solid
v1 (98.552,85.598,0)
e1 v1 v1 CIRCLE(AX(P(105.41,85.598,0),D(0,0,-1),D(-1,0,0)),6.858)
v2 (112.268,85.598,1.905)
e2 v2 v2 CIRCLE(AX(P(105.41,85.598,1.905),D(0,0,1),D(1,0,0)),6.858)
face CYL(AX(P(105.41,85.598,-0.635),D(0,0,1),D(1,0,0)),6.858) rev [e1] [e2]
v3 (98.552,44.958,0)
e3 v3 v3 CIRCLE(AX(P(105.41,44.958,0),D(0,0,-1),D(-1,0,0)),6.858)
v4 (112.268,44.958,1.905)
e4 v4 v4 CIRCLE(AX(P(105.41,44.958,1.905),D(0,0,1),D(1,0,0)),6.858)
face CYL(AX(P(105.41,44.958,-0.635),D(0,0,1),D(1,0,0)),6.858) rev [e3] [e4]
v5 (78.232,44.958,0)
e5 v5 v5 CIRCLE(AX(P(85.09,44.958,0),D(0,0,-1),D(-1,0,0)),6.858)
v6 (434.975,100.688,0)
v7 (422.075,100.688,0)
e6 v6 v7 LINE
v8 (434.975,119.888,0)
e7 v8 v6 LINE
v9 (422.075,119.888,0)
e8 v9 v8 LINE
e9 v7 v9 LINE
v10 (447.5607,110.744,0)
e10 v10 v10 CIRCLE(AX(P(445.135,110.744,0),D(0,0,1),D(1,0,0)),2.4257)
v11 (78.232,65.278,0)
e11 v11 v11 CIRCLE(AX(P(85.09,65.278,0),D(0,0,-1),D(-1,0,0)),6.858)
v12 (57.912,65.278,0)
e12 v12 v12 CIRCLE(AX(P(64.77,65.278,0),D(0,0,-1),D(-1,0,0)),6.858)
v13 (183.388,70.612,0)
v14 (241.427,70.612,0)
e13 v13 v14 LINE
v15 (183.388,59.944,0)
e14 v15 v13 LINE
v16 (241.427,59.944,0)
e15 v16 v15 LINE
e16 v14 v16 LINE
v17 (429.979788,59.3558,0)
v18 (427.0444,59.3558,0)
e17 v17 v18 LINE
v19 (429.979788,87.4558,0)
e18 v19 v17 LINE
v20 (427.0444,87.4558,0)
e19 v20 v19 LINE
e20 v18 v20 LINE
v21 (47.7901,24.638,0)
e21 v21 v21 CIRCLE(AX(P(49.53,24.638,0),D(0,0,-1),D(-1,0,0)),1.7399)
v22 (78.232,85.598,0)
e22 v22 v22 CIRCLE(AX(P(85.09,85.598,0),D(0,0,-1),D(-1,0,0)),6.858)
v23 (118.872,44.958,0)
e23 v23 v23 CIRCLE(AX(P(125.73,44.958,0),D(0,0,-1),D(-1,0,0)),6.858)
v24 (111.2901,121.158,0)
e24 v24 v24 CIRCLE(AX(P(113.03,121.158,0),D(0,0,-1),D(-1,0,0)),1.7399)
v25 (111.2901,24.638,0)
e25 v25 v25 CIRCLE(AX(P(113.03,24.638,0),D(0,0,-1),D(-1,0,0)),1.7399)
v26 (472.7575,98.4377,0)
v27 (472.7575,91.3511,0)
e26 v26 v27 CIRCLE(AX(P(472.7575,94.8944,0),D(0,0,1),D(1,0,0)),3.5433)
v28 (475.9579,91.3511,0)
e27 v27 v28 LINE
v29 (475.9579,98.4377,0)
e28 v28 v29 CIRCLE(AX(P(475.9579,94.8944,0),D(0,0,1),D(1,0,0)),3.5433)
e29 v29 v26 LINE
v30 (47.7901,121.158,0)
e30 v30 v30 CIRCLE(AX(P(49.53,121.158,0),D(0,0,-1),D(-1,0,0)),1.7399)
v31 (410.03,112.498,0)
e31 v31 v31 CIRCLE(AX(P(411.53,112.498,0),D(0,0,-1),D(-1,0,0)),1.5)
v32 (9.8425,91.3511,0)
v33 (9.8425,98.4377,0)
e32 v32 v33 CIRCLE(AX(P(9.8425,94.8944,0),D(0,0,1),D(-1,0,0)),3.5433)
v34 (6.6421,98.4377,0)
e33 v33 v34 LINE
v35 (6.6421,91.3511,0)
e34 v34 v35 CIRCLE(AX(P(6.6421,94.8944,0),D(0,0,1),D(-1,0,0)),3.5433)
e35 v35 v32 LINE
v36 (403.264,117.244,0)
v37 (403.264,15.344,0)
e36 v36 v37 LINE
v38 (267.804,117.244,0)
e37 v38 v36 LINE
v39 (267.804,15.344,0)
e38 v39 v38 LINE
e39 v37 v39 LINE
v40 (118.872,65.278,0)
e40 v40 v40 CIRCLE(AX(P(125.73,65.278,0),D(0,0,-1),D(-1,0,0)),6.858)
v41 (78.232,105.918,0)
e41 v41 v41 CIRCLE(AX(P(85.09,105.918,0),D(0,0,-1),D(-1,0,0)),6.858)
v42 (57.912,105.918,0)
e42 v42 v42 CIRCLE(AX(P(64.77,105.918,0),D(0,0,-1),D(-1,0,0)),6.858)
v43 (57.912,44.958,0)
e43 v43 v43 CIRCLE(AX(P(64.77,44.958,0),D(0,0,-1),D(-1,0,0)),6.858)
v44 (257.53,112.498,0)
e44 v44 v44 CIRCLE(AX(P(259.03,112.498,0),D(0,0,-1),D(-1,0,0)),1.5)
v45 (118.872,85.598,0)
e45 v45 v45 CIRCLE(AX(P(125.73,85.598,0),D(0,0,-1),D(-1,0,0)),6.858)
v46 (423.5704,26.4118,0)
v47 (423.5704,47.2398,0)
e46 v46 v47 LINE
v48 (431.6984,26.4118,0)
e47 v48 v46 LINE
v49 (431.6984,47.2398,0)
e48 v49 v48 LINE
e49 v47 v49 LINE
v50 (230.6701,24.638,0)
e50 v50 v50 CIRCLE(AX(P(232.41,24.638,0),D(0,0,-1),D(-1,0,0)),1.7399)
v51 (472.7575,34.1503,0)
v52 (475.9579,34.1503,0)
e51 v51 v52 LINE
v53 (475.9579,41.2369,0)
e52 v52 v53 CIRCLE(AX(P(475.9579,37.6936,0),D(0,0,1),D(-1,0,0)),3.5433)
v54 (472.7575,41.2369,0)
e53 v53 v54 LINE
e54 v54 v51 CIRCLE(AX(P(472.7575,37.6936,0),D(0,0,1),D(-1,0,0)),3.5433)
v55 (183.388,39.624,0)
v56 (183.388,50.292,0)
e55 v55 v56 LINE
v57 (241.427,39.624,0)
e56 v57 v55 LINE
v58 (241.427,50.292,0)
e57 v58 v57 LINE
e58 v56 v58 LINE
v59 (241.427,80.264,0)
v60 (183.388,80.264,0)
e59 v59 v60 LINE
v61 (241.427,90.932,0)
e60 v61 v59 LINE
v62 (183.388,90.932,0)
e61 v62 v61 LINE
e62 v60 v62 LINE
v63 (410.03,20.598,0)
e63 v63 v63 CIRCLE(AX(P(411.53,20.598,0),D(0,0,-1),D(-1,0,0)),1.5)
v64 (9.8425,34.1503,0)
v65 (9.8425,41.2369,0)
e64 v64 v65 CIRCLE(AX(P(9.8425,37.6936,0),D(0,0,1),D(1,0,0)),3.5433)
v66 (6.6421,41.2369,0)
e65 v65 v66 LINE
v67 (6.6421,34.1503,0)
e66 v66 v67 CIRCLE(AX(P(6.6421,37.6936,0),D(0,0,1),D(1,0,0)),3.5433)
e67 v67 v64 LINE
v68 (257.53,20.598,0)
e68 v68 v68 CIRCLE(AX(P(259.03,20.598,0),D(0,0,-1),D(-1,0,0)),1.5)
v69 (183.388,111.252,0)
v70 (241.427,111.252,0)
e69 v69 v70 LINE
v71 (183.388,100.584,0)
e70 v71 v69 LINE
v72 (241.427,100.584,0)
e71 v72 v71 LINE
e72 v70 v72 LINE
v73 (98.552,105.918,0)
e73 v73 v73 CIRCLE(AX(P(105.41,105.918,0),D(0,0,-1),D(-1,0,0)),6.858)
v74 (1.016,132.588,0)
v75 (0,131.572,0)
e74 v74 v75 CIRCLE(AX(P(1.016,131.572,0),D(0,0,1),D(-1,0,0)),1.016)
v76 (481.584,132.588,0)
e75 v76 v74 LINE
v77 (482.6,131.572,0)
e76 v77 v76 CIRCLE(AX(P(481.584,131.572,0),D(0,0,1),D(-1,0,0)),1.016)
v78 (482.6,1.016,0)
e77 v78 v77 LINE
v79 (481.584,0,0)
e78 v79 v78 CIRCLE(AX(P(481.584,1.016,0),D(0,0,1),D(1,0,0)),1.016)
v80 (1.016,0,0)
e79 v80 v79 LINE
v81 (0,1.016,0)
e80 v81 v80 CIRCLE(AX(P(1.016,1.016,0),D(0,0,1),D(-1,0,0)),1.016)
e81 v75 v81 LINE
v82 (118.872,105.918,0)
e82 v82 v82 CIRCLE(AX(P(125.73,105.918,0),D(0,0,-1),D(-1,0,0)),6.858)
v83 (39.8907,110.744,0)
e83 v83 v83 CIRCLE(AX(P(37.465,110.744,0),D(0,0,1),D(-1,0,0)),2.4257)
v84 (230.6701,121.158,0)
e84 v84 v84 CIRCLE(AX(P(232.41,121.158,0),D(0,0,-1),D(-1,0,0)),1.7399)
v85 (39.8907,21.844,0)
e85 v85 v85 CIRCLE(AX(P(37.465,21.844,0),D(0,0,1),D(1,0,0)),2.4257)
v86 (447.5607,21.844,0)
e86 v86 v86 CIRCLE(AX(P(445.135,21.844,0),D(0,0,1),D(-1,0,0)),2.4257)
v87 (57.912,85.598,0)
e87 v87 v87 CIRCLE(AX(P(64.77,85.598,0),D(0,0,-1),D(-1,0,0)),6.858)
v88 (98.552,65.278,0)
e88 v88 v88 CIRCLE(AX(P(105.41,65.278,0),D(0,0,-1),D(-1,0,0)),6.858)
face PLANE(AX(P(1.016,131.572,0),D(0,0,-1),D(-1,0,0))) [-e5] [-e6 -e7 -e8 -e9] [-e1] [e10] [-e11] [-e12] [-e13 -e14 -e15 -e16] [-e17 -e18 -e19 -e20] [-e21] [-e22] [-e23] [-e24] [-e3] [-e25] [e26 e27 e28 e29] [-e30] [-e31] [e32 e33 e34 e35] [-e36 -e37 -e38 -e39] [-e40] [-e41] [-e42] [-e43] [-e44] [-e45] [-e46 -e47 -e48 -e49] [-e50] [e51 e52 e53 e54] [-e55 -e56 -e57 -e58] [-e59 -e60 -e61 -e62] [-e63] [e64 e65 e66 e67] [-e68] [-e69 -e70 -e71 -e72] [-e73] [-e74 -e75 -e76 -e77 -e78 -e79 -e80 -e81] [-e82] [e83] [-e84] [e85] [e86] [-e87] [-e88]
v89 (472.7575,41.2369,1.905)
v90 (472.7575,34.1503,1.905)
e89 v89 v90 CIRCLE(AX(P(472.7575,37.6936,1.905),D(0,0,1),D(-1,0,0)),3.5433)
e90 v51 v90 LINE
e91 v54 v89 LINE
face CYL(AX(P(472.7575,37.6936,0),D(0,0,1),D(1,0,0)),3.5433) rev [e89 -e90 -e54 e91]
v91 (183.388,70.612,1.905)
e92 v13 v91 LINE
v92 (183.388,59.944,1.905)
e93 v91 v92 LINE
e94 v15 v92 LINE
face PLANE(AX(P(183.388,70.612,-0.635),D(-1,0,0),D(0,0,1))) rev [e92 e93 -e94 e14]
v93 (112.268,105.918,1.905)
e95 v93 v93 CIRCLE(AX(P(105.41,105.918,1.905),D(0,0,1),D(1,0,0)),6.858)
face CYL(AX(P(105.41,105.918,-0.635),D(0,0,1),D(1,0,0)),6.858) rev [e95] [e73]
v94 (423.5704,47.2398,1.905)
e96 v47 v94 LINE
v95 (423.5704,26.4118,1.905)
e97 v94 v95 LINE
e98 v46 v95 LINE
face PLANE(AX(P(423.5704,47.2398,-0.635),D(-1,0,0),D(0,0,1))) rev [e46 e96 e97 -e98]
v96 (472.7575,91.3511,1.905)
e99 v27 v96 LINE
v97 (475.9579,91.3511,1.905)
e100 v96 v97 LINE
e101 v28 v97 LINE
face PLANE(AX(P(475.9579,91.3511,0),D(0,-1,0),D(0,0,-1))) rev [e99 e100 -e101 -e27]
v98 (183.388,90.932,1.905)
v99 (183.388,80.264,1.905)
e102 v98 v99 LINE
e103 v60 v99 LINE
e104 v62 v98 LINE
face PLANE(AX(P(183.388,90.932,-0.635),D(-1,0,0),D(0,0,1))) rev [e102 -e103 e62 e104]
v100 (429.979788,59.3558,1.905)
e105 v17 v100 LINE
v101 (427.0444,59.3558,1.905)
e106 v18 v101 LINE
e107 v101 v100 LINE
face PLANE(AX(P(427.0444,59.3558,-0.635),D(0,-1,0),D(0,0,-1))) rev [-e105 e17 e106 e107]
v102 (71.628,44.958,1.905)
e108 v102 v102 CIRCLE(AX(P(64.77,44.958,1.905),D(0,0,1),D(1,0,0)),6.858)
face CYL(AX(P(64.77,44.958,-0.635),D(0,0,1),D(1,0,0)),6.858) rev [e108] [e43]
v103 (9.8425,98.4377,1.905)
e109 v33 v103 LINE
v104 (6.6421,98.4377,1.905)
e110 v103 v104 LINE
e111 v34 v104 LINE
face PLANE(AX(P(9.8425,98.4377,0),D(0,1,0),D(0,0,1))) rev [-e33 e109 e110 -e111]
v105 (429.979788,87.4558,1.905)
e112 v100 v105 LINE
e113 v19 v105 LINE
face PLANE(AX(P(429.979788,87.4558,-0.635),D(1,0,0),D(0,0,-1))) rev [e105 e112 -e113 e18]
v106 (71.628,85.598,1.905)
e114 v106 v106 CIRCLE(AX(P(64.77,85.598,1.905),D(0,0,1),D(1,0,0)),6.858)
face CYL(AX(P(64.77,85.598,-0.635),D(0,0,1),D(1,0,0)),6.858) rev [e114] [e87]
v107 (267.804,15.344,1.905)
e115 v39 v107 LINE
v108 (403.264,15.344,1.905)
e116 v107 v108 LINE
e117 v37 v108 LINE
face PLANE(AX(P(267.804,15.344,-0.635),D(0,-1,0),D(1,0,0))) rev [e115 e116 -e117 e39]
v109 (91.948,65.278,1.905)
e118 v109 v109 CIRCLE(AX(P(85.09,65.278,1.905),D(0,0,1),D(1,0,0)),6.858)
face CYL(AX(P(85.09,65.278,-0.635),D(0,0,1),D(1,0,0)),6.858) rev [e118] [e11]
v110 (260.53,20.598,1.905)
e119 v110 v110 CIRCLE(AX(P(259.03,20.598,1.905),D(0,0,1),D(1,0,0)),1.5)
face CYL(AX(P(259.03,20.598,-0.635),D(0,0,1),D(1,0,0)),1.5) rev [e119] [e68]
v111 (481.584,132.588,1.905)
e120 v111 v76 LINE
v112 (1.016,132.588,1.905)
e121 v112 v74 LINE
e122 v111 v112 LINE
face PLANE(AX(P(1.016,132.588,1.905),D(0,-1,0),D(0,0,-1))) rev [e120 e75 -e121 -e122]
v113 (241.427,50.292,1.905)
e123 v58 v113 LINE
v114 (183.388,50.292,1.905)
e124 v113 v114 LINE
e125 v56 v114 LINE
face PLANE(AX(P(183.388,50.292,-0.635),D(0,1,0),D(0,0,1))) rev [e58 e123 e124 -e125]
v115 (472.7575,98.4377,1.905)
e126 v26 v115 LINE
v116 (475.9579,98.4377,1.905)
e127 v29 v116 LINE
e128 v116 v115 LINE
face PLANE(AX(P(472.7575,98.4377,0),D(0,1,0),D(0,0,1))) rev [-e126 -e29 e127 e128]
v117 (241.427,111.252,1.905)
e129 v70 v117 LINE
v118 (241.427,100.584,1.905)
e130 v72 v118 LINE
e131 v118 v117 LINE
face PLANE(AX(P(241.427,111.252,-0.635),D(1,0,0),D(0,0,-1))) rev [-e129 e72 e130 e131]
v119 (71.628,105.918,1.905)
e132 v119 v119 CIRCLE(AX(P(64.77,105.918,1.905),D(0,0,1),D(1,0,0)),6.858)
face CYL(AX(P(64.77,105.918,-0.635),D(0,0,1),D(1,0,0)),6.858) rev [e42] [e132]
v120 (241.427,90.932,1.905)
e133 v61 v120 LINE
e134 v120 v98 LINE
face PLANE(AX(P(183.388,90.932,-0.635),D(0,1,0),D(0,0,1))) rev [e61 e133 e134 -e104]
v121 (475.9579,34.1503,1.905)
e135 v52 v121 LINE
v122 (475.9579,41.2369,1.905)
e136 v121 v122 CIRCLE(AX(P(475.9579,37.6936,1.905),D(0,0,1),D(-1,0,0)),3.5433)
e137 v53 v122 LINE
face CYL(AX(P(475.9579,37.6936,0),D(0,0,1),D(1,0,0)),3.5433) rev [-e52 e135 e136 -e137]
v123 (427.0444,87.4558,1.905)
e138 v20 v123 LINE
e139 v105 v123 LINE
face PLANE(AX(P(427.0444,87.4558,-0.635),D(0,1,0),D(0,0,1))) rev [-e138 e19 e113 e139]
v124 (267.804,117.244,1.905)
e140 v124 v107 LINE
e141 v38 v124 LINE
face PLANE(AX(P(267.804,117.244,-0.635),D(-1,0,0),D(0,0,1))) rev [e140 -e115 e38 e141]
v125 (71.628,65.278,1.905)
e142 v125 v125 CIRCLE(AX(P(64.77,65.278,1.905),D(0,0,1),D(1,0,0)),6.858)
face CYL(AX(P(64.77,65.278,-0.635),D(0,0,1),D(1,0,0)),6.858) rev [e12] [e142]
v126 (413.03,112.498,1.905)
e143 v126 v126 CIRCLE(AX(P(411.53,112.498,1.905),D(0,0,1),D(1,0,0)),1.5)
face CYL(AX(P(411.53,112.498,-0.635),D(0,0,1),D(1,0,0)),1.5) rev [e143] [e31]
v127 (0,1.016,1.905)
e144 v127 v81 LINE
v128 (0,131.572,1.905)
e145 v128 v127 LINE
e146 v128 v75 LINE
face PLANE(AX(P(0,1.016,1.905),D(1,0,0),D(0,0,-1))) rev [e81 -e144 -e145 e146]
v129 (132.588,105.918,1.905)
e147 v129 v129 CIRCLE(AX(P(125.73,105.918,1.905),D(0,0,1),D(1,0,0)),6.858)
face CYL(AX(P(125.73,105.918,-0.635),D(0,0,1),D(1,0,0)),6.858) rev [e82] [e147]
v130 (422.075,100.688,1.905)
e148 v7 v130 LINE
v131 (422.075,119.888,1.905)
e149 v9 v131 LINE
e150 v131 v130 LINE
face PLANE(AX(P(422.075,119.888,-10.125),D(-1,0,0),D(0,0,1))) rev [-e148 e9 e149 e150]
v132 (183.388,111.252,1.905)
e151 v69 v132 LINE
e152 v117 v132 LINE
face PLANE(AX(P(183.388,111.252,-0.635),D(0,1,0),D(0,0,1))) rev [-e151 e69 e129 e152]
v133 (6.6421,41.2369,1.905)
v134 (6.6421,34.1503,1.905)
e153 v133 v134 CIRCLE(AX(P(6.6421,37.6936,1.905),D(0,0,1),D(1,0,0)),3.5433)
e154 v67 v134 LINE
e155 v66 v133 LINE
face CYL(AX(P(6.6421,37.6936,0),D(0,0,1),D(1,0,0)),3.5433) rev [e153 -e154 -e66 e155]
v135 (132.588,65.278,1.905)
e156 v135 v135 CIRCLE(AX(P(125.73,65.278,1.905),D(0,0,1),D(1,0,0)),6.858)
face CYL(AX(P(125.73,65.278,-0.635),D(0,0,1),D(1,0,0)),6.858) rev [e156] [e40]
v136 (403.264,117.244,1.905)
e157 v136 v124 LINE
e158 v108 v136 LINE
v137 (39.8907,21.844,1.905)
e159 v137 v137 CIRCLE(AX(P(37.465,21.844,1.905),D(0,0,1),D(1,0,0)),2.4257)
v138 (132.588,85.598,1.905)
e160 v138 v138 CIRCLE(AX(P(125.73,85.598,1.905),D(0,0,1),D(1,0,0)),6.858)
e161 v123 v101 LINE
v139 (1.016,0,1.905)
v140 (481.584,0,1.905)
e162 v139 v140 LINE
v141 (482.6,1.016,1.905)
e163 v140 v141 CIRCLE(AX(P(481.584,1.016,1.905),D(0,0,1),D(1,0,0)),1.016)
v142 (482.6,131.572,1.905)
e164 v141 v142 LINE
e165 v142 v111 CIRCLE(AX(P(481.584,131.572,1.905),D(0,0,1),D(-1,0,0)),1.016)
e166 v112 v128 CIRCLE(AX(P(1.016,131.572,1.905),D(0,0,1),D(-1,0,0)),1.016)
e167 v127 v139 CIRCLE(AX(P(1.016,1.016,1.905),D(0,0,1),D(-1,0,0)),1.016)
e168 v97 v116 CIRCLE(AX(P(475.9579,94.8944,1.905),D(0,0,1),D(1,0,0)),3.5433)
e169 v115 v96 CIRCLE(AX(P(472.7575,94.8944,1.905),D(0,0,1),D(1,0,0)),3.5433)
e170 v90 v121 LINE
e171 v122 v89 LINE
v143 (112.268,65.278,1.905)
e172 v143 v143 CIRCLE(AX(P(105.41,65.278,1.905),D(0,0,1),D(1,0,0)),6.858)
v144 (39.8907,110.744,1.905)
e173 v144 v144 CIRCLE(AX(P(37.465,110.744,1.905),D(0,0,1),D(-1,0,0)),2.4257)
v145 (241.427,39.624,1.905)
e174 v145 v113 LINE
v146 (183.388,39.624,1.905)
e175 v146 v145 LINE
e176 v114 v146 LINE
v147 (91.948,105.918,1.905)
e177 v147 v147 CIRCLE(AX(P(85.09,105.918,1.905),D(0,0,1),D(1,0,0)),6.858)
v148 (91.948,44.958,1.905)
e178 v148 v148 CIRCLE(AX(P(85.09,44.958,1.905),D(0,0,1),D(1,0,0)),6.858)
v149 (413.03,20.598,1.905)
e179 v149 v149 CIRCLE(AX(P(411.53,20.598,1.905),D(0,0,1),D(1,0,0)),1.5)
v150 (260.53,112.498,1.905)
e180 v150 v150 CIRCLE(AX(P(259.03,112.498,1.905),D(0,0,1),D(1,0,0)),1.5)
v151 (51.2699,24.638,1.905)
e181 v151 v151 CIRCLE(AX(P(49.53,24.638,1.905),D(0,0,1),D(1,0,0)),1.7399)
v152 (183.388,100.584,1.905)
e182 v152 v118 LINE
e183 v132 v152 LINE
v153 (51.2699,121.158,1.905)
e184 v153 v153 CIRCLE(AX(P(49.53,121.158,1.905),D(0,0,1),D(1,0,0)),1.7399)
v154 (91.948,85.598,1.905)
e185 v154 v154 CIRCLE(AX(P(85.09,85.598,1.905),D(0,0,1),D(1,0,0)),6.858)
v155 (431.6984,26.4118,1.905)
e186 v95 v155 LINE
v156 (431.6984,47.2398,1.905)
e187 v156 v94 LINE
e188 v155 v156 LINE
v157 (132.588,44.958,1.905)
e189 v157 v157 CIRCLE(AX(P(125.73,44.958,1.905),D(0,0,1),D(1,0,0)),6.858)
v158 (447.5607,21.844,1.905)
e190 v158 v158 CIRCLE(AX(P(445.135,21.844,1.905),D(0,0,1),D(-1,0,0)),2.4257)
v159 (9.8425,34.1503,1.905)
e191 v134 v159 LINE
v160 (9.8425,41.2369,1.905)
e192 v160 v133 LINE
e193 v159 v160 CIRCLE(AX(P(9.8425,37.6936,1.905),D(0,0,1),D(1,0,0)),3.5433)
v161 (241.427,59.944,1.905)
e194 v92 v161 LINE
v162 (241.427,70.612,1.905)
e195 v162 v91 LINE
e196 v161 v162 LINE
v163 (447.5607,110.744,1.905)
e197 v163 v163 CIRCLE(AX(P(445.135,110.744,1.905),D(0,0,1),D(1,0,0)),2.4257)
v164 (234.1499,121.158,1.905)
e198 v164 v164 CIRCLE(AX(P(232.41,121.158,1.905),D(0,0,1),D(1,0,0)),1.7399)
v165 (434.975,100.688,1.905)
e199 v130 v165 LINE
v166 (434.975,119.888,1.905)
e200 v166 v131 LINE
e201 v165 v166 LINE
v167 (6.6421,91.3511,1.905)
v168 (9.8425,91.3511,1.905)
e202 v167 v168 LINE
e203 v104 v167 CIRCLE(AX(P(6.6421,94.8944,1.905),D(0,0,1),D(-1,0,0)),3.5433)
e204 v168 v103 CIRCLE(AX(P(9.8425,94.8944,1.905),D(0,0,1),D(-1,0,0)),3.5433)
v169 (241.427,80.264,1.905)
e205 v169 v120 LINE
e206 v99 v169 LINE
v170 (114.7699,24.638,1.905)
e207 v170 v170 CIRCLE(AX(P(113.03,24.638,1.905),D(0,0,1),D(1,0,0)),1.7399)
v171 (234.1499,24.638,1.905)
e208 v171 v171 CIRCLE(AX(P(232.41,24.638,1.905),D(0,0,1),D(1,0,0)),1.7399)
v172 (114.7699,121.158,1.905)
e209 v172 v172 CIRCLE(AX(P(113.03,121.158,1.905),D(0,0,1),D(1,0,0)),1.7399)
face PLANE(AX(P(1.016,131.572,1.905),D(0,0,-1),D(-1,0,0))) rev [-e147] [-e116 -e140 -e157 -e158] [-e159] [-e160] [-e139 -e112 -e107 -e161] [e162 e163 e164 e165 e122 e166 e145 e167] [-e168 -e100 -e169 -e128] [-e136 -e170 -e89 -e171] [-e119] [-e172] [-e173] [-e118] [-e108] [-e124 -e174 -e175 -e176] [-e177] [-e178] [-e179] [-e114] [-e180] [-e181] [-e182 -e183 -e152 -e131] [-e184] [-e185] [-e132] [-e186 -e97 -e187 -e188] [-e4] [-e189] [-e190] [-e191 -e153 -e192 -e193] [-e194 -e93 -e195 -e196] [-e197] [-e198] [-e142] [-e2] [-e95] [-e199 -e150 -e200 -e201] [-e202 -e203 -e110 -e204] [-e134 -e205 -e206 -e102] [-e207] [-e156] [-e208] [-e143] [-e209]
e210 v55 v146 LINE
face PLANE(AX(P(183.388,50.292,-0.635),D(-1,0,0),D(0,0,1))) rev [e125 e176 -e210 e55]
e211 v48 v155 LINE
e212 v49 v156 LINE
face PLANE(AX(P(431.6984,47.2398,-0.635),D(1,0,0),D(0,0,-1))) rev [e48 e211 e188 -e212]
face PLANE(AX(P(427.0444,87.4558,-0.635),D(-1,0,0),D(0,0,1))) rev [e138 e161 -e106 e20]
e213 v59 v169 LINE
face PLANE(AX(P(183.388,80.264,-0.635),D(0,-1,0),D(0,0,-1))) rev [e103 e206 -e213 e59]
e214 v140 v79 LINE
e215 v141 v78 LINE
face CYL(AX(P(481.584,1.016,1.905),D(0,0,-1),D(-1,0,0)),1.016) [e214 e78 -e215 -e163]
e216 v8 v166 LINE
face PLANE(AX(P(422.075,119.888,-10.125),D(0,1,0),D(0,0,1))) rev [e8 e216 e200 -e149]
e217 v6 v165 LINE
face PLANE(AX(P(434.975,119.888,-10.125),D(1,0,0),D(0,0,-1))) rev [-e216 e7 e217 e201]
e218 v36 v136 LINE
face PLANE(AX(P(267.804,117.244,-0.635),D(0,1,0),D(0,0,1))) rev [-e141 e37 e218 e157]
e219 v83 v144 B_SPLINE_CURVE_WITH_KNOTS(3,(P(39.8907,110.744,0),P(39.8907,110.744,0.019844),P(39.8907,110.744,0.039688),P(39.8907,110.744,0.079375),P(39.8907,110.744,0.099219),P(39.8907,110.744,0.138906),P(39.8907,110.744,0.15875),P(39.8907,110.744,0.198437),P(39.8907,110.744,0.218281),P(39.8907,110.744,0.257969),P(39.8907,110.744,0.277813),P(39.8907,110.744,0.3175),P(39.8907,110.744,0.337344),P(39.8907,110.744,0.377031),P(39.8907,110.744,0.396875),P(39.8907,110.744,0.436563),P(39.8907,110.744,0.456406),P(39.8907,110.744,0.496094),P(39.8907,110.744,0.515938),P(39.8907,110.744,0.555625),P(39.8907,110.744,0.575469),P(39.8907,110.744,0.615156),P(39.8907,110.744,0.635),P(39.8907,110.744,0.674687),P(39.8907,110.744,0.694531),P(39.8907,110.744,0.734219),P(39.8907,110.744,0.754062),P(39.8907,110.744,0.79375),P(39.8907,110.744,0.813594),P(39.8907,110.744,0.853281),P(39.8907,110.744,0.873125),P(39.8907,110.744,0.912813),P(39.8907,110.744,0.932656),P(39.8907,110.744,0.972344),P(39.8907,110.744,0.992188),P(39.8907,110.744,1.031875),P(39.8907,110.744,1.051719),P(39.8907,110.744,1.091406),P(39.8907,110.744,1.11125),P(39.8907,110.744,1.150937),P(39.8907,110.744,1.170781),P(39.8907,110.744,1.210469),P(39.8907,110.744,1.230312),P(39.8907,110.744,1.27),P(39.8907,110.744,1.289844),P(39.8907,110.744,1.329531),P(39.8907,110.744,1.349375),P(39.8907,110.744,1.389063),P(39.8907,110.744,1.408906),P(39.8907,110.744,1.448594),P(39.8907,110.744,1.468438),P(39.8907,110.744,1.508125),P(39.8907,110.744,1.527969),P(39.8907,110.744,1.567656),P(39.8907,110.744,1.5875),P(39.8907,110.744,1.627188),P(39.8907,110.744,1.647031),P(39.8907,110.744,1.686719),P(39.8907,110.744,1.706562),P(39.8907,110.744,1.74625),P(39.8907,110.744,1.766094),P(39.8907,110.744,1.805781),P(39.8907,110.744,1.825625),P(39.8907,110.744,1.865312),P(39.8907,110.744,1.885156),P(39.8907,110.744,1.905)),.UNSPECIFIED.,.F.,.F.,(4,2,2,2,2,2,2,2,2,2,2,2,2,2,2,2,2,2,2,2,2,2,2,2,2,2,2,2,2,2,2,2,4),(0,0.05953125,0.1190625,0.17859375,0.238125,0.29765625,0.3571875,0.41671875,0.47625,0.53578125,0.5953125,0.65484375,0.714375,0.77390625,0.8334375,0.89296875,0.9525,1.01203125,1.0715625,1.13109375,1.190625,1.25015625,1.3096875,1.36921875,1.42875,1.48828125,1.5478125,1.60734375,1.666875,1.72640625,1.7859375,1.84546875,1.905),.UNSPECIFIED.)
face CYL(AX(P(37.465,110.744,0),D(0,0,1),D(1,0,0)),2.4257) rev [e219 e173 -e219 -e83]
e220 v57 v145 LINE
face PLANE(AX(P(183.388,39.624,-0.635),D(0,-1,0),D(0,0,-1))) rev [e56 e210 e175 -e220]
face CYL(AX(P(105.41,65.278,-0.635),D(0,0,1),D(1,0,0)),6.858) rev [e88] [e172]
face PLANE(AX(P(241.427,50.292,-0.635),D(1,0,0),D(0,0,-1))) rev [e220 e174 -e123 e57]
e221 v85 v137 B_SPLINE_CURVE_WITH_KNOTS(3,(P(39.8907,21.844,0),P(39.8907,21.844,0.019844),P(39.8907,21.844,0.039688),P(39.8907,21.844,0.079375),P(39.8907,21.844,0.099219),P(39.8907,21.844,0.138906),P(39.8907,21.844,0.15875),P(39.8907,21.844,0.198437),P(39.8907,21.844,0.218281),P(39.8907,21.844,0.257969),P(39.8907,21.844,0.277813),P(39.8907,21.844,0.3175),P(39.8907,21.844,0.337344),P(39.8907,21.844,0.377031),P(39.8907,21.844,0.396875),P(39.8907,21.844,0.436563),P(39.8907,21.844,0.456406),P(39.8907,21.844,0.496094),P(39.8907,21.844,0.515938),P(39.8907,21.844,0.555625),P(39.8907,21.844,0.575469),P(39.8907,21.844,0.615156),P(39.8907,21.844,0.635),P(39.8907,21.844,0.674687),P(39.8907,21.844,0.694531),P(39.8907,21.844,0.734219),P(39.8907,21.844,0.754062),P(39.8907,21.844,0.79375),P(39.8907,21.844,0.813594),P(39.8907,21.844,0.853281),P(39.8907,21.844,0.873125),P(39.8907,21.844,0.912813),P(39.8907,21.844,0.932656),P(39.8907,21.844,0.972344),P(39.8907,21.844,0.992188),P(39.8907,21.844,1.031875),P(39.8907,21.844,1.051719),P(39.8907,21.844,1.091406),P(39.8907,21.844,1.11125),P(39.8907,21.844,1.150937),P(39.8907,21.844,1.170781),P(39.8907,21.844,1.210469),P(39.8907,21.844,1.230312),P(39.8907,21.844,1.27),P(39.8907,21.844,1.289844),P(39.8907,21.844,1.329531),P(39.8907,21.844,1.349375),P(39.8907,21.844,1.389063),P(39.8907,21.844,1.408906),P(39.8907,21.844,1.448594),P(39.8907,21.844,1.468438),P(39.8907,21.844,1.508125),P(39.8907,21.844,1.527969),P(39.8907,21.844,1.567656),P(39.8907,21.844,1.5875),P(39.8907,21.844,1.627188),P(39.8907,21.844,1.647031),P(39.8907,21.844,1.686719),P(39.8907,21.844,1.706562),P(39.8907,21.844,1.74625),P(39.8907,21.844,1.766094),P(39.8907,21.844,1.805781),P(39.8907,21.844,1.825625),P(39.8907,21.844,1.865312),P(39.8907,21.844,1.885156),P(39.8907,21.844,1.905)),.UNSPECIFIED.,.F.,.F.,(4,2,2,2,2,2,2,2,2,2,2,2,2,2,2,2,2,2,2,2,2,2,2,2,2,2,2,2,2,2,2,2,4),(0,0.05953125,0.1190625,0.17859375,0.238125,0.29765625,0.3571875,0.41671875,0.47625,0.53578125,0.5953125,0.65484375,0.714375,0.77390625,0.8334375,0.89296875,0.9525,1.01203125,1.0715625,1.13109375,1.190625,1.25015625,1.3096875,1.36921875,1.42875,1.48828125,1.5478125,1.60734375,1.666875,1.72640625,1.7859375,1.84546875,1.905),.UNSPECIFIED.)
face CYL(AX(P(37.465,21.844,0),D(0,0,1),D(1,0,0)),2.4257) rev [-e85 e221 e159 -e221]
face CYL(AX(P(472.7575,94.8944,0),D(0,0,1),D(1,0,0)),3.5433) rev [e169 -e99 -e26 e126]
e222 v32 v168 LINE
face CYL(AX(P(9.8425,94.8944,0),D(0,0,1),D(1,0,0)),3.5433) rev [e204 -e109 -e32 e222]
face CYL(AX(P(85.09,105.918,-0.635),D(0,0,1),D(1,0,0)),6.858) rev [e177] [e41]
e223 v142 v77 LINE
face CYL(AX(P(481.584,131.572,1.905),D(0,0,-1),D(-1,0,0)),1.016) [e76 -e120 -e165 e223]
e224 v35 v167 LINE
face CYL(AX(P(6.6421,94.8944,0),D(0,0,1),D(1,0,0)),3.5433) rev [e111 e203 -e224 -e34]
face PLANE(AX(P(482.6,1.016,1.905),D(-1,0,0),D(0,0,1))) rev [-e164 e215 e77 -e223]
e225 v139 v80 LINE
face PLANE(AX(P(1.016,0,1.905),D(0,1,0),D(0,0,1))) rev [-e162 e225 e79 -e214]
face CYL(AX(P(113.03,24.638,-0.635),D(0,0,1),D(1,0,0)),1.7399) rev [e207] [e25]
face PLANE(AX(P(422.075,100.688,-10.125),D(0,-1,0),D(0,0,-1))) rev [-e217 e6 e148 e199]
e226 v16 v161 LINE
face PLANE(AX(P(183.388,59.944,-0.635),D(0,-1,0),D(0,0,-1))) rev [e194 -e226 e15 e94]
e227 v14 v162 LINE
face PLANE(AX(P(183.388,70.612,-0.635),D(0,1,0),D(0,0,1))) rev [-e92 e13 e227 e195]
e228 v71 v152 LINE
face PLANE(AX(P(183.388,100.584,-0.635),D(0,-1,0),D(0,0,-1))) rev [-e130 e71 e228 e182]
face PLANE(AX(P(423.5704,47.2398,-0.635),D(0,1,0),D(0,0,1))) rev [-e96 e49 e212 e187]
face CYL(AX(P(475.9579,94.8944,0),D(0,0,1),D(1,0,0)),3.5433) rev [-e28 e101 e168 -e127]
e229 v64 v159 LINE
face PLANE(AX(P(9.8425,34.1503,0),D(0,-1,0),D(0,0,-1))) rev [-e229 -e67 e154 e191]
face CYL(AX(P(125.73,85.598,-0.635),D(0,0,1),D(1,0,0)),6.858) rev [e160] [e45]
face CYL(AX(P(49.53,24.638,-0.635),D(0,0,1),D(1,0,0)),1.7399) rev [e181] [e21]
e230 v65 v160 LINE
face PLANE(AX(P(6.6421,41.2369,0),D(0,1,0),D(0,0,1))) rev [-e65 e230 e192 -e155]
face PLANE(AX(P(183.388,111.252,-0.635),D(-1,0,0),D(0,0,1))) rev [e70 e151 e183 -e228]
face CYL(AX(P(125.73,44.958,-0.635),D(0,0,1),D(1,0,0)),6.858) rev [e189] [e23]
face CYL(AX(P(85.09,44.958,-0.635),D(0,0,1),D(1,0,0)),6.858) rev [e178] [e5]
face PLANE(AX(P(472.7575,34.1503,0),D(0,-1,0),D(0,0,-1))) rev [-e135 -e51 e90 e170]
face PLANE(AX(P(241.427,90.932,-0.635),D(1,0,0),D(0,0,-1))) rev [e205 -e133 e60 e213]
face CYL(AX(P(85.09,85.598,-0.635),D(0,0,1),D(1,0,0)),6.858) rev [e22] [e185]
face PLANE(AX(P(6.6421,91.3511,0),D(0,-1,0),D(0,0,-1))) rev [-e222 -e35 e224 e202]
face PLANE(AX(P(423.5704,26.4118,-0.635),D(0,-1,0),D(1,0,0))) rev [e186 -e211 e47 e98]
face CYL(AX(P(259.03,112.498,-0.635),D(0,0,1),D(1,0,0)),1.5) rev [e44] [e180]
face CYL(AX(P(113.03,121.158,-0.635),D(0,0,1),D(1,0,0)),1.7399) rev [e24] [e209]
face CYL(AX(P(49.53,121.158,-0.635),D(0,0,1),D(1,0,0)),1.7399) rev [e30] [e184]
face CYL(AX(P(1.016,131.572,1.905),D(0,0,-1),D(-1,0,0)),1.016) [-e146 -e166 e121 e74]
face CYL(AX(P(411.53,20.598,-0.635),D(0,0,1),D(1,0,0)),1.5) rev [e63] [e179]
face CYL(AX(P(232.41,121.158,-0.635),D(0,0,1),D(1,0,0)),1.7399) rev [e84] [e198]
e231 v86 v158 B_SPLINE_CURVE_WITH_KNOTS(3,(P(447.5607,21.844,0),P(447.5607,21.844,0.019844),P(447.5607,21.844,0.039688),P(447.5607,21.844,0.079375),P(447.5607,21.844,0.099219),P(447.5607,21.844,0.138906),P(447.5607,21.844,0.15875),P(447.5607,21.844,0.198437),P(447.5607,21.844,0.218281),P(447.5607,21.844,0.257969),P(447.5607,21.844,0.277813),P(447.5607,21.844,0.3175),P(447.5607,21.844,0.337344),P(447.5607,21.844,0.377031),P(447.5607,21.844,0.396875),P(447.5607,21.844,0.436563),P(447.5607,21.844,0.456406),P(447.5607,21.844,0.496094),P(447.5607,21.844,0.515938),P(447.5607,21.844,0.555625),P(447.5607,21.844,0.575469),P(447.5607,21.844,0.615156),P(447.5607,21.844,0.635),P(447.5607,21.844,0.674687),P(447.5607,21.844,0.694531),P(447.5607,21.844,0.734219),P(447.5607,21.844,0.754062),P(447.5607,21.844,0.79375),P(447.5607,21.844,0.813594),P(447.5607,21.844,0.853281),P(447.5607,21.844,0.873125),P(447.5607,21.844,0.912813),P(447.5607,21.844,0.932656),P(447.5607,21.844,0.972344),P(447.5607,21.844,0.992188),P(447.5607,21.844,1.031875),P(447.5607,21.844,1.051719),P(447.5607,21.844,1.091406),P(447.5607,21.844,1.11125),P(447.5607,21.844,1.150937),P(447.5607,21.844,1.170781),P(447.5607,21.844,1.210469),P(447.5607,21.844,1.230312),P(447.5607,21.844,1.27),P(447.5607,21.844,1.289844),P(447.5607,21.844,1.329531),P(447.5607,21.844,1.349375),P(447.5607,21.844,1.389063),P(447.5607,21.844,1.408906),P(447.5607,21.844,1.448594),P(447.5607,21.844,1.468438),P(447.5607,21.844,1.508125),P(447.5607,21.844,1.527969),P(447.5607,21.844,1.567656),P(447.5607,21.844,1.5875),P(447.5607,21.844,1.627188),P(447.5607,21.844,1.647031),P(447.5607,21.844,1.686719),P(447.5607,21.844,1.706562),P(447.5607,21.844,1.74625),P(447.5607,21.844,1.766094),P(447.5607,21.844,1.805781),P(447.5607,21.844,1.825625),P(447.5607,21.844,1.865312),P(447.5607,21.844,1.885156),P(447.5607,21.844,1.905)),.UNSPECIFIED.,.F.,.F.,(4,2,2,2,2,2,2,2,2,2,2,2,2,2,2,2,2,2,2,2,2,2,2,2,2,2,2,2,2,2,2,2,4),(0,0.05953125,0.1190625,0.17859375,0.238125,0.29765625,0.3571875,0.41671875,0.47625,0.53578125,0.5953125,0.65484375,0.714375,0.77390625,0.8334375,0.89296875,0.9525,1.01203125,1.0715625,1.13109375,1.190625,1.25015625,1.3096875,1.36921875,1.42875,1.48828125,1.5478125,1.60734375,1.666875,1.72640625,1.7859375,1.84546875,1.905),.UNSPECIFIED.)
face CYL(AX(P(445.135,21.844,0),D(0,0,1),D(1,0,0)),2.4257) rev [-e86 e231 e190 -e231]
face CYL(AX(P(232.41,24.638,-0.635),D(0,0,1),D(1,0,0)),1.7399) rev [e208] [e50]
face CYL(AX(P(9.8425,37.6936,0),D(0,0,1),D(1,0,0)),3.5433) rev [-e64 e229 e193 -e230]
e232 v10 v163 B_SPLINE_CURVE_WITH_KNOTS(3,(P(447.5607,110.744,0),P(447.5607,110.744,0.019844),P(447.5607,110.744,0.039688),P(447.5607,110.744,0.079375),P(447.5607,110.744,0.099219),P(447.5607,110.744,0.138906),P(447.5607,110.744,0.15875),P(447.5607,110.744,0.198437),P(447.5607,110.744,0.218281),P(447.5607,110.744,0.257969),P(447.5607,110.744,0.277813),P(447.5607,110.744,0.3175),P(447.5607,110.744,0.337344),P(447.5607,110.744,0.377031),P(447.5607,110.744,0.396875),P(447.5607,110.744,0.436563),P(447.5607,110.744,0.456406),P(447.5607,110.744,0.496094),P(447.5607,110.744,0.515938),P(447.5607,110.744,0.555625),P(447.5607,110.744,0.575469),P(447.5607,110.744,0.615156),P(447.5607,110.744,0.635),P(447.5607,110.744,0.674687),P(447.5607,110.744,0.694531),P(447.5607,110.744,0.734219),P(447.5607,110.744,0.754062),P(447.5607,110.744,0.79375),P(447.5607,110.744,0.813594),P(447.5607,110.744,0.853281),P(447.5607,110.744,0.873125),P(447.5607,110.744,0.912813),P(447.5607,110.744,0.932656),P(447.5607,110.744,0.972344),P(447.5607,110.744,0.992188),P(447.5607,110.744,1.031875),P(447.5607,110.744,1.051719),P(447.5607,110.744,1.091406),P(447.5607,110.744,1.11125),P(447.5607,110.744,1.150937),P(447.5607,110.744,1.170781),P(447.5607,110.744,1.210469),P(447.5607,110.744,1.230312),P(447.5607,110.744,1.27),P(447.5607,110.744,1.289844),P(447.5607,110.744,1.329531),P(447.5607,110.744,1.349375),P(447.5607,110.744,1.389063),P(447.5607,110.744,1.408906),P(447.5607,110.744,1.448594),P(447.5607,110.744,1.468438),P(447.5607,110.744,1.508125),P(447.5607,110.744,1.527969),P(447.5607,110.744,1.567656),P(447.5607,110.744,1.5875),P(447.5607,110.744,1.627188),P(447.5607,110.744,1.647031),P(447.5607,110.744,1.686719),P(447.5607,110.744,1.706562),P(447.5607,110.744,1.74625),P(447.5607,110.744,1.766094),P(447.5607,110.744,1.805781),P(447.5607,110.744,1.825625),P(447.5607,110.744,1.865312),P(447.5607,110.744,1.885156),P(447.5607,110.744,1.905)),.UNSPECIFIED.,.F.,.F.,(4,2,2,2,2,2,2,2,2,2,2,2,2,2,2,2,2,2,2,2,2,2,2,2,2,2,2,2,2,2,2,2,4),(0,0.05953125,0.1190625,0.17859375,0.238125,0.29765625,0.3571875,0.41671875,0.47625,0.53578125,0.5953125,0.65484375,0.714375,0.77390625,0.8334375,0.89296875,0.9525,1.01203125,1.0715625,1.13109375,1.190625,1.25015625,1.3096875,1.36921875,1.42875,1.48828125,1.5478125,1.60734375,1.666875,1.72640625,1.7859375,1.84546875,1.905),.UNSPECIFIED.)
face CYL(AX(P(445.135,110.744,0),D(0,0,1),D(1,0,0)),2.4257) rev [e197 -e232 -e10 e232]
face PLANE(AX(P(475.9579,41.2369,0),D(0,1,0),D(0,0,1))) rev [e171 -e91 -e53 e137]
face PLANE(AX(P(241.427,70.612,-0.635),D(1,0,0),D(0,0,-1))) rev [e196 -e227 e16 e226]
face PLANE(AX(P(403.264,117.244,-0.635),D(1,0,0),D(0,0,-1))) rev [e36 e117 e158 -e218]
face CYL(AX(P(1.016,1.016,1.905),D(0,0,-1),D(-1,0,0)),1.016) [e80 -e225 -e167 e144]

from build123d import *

# Parameters (mm, degrees)
FRONT_PANEL_DEPTH                = 1.905
SKETCH5_R                        = 2.4257
SKETCH5_R_2                      = 2.0701
FRONT_PANEL_MOUNTING_HOLES_DEPTH = 1.905
RACK_MOUNTING_SLOT_DEPTH         = 1.905
ADIO_MOUNTING_HOLES_R            = 1.7399
CUT_EXTRUDE1_DEPTH               = 2.54
SKETCH8_R                        = 6.858
BNC_SEED_HOLE_DEPTH              = 2.54
BNC_PATTERN_COUNT                = 4
BNC_PATTERN_PITCH                = 20.32
BNC_PATTERN_COUNT_DIR2           = 4
BNC_PATTERN_PITCH_DIR2           = 20.32
SKETCH9_W                        = 58.039
SKETCH9_H                        = 10.668
DIO_SEED_HOLE_DEPTH              = 2.54
DIO_PATTERN_COUNT                = 4
DIO_PATTERN_PITCH                = 20.32
LCD_VIEW_CUTOUT_W                = 135.46
LCD_VIEW_CUTOUT_H                = 101.9
LCD_CUTOUT_DEPTH                 = 2.54
LCD_MOUNT_HOLES_R                = 1.5
LCD_MOUNT_HOLE_CUT_DEPTH         = 2.54
SKETCH10_W                       = 12.9
SKETCH10_H                       = 19.2
POWER_SW_CUT_DEPTH               = 12.03
SKETCH11_W                       = 2.935387627
SKETCH11_H                       = 28.1
SKETCH11_W_2                     = 8.128
SKETCH11_H_2                     = 20.828
CUT_EXTRUDE8_DEPTH               = 2.54


# Sheet-metal steps are written as plain solids
with BuildPart() as part:
    # Sketch1 → Front Panel (new body)
    with BuildSketch(Plane.XY):
        with BuildLine():
            Line((1.016, 0), (481.584, 0))
            ThreePointArc((481.584, 0), (482.30242049, 0.29757951), (482.6, 1.016))
            Line((482.6, 1.016), (482.6, 131.572))
            ThreePointArc((482.6, 131.572), (482.30242049, 132.29042049), (481.584, 132.588))
            Line((481.584, 132.588), (1.016, 132.588))
            ThreePointArc((1.016, 132.588), (0.29757951, 132.29042049), (0, 131.572))
            Line((0, 131.572), (0, 1.016))
            ThreePointArc((0, 1.016), (0.29757951, 0.29757951), (1.016, 0))
        make_face()
    extrude(amount=FRONT_PANEL_DEPTH)

    # Sketch5 → Front Panel Mounting Holes (cut)
    with BuildSketch(Plane.XY.offset(1.905)):
        with Locations((445.135, 21.844)):
            Circle(SKETCH5_R)
        with Locations((37.465, 21.844)):
            Circle(SKETCH5_R)
        with Locations((37.465, 110.744)):
            Circle(SKETCH5_R)
        with Locations((445.135, 110.744)):
            Circle(SKETCH5_R)
        with Locations((241.3, -19.907000064)):
            Circle(SKETCH5_R_2)
    extrude(amount=-FRONT_PANEL_MOUNTING_HOLES_DEPTH, mode=Mode.SUBTRACT)

    # Sketch2 → Rack Mounting Slot (cut)
    with BuildSketch(Plane.XY.offset(1.905)):
        with BuildLine():
            Line((472.7575, 34.1503), (475.9579, 34.1503))
            ThreePointArc((475.9579, 34.1503), (479.5012, 37.6936), (475.9579, 41.2369))
            Line((475.9579, 41.2369), (472.7575, 41.2369))
            ThreePointArc((472.7575, 41.2369), (469.2142, 37.6936), (472.7575, 34.1503))
        make_face()
        with BuildLine():
            Line((9.8425, 98.4377), (6.6421, 98.4377))
            ThreePointArc((6.6421, 98.4377), (3.0988, 94.8944), (6.6421, 91.3511))
            Line((6.6421, 91.3511), (9.8425, 91.3511))
            ThreePointArc((9.8425, 91.3511), (13.3858, 94.8944), (9.8425, 98.4377))
        make_face()
        with BuildLine():
            Line((6.6421, 41.2369), (9.8425, 41.2369))
            ThreePointArc((9.8425, 41.2369), (13.3858, 37.6936), (9.8425, 34.1503))
            Line((9.8425, 34.1503), (6.6421, 34.1503))
            ThreePointArc((6.6421, 34.1503), (3.0988, 37.6936), (6.6421, 41.2369))
        make_face()
        with BuildLine():
            Line((475.9579, 91.3511), (472.7575, 91.3511))
            ThreePointArc((472.7575, 91.3511), (469.2142, 94.8944), (472.7575, 98.4377))
            Line((472.7575, 98.4377), (475.9579, 98.4377))
            ThreePointArc((475.9579, 98.4377), (479.5012, 94.8944), (475.9579, 91.3511))
        make_face()
    extrude(amount=-RACK_MOUNTING_SLOT_DEPTH, mode=Mode.SUBTRACT)

    # ADio mounting holes → Cut-Extrude1 (cut)
    with BuildSketch(Plane.XY.offset(1.905)):
        with Locations((49.53, 121.158)):
            Circle(ADIO_MOUNTING_HOLES_R)
        with Locations((113.03, 121.158)):
            Circle(ADIO_MOUNTING_HOLES_R)
        with Locations((232.41, 121.158)):
            Circle(ADIO_MOUNTING_HOLES_R)
        with Locations((49.53, 24.638)):
            Circle(ADIO_MOUNTING_HOLES_R)
        with Locations((113.03, 24.638)):
            Circle(ADIO_MOUNTING_HOLES_R)
        with Locations((232.41, 24.638)):
            Circle(ADIO_MOUNTING_HOLES_R)
    extrude(amount=-CUT_EXTRUDE1_DEPTH, mode=Mode.SUBTRACT)

    # Sketch8 → BNC seed hole (cut)
    with BuildSketch(Plane.XY.offset(1.905)):
        with Locations((64.77, 105.918)):
            Circle(SKETCH8_R)
    bnc_seed_hole = extrude(amount=-BNC_SEED_HOLE_DEPTH, mode=Mode.SUBTRACT)

    # BNC pattern: BNC seed hole 4 × 4
    with Locations(*[(i * BNC_PATTERN_PITCH, -j * BNC_PATTERN_PITCH_DIR2, 0) for i in range(BNC_PATTERN_COUNT) for j in range(BNC_PATTERN_COUNT_DIR2) if (i, j) != (0, 0)]):
        add(bnc_seed_hole, mode=Mode.SUBTRACT)

    # Sketch9 → DIO Seed Hole (cut)
    with BuildSketch(Plane.XY.offset(1.905)):
        with Locations((212.4075, 105.918)):
            Rectangle(SKETCH9_W, SKETCH9_H)
    dio_seed_hole = extrude(amount=-DIO_SEED_HOLE_DEPTH, mode=Mode.SUBTRACT)

    # DIO Pattern: DIO Seed Hole ×4
    with Locations(*[(0, -i * DIO_PATTERN_PITCH, 0) for i in range(1, DIO_PATTERN_COUNT)]):
        add(dio_seed_hole, mode=Mode.SUBTRACT)

    # LCD view cutout → LCD Cutout (cut)
    with BuildSketch(Plane.XY.offset(1.905)):
        with Locations((335.534, 66.294)):
            Rectangle(LCD_VIEW_CUTOUT_W, LCD_VIEW_CUTOUT_H)
    extrude(amount=-LCD_CUTOUT_DEPTH, mode=Mode.SUBTRACT)

    # LCD mount holes → LCD mount hole - cut (cut)
    with BuildSketch(Plane.XY.offset(1.905)):
        with Locations((259.03, 112.498)):
            Circle(LCD_MOUNT_HOLES_R)
        with Locations((411.53, 112.498)):
            Circle(LCD_MOUNT_HOLES_R)
        with Locations((259.03, 20.598)):
            Circle(LCD_MOUNT_HOLES_R)
        with Locations((411.53, 20.598)):
            Circle(LCD_MOUNT_HOLES_R)
    extrude(amount=-LCD_MOUNT_HOLE_CUT_DEPTH, mode=Mode.SUBTRACT)

    # Sketch10 → power sw - cut (cut)
    with BuildSketch(Plane.XY.offset(1.905)):
        with Locations((428.525, 110.288)):
            Rectangle(SKETCH10_W, SKETCH10_H)
    extrude(amount=-POWER_SW_CUT_DEPTH, mode=Mode.SUBTRACT)

    # Sketch11 → Cut-Extrude8 (cut)
    with BuildSketch(Plane.XY.offset(1.905)):
        with Locations((428.512093814, 73.405799856)):
            Rectangle(SKETCH11_W, SKETCH11_H)
        with Locations((427.6344, 36.825799856)):
            Rectangle(SKETCH11_W_2, SKETCH11_H_2)
    extrude(amount=-CUT_EXTRUDE8_DEPTH, mode=Mode.SUBTRACT)


solid = part.part
